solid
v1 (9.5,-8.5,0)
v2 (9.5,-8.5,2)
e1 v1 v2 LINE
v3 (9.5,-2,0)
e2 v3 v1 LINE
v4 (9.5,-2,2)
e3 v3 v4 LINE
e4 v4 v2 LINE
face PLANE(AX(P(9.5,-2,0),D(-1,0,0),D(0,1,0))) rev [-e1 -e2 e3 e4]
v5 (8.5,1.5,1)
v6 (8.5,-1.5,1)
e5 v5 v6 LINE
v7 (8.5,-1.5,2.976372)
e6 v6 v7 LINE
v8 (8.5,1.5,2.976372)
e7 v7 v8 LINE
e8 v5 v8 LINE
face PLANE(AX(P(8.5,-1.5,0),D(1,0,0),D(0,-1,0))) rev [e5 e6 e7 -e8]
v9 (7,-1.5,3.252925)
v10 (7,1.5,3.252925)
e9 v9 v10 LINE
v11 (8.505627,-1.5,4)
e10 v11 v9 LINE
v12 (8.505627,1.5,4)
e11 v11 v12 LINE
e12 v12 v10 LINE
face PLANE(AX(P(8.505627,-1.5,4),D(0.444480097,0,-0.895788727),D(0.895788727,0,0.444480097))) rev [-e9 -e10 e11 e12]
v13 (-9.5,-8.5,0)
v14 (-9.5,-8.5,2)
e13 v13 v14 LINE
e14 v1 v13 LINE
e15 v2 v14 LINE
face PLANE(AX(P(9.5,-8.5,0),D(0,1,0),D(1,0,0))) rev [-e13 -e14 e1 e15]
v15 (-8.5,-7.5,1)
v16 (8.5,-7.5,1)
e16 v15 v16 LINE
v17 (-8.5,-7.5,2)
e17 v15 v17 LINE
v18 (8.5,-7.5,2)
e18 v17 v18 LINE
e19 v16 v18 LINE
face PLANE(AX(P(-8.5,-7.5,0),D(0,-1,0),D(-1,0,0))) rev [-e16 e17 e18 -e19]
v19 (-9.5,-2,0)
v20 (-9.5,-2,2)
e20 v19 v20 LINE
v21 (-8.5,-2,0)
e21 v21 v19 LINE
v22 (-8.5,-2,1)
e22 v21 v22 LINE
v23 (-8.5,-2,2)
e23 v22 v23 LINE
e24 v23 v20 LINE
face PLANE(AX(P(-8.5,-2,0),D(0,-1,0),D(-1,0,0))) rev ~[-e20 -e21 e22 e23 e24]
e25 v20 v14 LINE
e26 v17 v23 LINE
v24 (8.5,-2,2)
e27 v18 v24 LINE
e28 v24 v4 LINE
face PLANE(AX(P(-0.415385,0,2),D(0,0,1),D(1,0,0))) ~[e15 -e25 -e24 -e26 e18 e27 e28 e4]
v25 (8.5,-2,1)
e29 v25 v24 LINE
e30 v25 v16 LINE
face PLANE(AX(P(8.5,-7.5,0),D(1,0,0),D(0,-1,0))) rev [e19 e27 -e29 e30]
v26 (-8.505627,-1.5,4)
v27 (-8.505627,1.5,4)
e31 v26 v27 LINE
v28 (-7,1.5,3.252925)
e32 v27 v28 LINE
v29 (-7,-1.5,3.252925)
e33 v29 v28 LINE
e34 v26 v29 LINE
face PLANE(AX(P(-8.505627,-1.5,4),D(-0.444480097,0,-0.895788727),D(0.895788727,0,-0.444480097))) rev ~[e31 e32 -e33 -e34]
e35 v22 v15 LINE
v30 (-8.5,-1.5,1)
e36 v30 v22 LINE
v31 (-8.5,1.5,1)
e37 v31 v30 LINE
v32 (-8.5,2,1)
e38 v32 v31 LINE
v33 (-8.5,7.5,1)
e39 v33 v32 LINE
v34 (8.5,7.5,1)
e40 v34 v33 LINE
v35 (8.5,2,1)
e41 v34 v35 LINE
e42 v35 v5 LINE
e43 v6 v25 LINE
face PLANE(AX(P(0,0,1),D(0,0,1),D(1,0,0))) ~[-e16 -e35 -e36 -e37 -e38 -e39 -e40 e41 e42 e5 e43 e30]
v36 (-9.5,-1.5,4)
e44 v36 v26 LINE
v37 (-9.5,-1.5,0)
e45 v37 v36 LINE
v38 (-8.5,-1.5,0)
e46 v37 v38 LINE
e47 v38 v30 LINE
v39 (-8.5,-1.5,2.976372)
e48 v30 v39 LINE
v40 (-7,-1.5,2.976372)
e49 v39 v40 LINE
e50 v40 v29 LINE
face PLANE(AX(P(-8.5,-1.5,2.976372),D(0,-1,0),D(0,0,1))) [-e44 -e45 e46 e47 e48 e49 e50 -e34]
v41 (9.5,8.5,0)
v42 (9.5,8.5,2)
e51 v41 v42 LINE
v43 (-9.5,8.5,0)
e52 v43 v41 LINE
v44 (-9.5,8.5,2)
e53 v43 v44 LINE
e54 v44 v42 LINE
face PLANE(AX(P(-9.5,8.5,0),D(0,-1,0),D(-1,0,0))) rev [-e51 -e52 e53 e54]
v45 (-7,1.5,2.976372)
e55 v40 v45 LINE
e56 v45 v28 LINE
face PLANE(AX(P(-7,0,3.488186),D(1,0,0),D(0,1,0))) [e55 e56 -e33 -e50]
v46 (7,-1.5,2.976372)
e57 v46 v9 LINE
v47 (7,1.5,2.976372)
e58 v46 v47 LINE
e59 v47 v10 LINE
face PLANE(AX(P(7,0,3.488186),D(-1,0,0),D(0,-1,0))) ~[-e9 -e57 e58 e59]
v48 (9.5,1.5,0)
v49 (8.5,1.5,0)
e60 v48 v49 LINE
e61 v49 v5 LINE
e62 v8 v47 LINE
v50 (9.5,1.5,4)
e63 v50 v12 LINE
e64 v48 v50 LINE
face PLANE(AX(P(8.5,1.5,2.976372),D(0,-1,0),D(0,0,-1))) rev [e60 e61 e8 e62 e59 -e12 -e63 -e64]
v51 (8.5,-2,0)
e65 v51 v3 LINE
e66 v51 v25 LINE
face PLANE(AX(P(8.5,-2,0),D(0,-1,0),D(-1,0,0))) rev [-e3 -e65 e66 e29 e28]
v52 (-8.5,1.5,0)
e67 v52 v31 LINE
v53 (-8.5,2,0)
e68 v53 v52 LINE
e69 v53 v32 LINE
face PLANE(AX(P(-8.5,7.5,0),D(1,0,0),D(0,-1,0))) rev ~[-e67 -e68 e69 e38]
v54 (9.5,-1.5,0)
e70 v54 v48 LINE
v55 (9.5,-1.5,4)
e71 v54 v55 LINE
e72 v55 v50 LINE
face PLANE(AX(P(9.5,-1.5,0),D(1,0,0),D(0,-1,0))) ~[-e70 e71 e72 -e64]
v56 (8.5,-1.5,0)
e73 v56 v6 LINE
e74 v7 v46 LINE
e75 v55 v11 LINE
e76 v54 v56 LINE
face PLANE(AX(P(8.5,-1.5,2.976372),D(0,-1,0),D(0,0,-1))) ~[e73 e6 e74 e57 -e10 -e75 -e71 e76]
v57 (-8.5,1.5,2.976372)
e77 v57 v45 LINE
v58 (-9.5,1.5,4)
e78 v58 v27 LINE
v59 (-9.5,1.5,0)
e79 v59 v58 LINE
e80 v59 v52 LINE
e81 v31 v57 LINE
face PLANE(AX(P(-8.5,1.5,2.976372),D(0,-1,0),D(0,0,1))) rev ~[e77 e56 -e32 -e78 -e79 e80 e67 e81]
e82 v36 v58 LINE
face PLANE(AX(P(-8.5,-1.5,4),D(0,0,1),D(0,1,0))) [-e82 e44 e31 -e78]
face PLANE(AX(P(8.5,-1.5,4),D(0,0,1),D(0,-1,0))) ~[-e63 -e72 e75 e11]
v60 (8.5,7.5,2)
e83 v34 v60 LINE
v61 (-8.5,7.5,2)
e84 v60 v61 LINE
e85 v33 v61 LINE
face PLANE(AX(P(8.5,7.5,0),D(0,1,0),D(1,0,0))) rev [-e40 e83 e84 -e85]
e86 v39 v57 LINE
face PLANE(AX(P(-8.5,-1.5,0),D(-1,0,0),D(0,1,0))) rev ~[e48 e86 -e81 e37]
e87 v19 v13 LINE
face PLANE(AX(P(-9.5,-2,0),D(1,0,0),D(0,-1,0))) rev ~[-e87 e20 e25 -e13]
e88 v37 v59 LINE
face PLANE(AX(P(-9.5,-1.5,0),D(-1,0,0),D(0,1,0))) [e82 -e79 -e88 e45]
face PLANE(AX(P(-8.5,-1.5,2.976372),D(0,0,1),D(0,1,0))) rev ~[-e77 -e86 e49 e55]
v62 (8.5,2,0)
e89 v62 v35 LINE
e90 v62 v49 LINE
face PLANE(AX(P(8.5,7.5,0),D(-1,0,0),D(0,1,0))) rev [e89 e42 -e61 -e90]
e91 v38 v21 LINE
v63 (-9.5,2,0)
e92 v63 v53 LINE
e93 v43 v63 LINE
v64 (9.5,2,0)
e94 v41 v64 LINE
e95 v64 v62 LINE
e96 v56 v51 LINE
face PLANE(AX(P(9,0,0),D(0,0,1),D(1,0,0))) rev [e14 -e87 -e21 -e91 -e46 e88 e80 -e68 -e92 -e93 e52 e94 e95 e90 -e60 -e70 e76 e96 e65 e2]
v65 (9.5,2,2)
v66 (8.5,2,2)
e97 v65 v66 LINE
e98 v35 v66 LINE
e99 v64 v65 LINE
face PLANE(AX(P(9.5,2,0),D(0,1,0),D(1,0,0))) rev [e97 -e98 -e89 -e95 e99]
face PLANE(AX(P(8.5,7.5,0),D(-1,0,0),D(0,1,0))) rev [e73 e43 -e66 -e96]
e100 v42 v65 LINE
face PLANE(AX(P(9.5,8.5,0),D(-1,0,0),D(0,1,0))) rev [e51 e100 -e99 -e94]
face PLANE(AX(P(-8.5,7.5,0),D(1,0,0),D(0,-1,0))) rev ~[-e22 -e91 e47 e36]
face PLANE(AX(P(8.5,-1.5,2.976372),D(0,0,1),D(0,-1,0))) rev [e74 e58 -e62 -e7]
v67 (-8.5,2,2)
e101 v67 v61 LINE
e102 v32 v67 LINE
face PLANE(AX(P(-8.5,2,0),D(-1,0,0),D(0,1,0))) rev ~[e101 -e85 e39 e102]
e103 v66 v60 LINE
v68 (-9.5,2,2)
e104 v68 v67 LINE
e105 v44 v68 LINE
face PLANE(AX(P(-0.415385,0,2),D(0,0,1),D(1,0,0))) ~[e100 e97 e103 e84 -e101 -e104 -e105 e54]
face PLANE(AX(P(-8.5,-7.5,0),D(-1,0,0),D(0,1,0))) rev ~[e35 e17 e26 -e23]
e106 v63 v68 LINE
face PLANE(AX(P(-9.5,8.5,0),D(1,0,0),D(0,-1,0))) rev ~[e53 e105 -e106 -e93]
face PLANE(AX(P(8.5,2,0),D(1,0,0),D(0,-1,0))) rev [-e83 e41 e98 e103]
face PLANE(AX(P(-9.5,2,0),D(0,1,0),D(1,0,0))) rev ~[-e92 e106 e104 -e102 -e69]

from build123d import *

# Parameters (mm, degrees)
F1_DEPTH  = 1
F2_DEPTH  = 2
F0_W      = 1
F0_H      = 3
F3_DEPTH  = 4
F4_W      = 3
F4_H      = 1.0236278605
F5_DEPTH  = 1.5
F7_DEPTH  = 3
F9_DEPTH  = 2
F10_W     = 8.5
F10_H     = 15
F11_DEPTH = 2


# Not quite as in the source:
# - a feature names something its author has since deleted; it is built from what else it names


with BuildPart() as f1:
    # F0 (on Top) → F1 (new body)
    with BuildSketch(Plane.XY):
        Polygon((-8.5, 7.5), (-8.5, 2), (-8.5, 1.5), (-8.5, -1.5), (-8.5, -2), (-8.5, -7.5), (8.5, -7.5), (8.5, 7.5), align=None)
    extrude(amount=F1_DEPTH)

    # F0 (on Top) → F2 (join)
    with BuildSketch(Plane.XY):
        Polygon((9.5, 8.5), (-9.5, 8.5), (-9.5, 2), (-8.5, 2), (-8.5, 7.5), (8.5, 7.5), (8.5, -7.5), (-8.5, -7.5), (-8.5, -2), (-9.5, -2), (-9.5, -8.5), (9.5, -8.5), align=None)
    extrude(amount=F2_DEPTH)

    # F0 (on Top) → F3 (join)
    with BuildSketch(Plane.XY):
        with Locations((-9, 0)):
            Rectangle(F0_W, F0_H)
    extrude(amount=F3_DEPTH)

    # F4 (on face) → F5 (join)
    with BuildSketch(Plane.YZ.offset(-8.5)):
        with Locations((0, 3.4881860698)):
            Rectangle(F4_W, F4_H)
    extrude(amount=F5_DEPTH)

    # F6 (on face) → F7 (cut)
    with BuildSketch(Plane.XZ.offset(1.5)):
        Polygon((-8.5056265816, 4), (-7, 3.2529253513), (-7, 4), align=None)
    extrude(amount=-F7_DEPTH, mode=Mode.SUBTRACT)

    # F8 (on face) → F9 (cut)
    with BuildSketch(Plane.XY.offset(2)):
        Polygon((9.5, 8.5), (0, 8.5), (0, 7.5), (8.5, 7.5), (8.5, -7.5), (0, -7.5), (0, -8.5), (9.5, -8.5), align=None)
    extrude(amount=-F9_DEPTH, mode=Mode.SUBTRACT)

    # F10 (on face) → F11 (cut)
    with BuildSketch(Plane.XY.offset(1)):
        with Locations((4.25, 0)):
            Rectangle(F10_W, F10_H)
    extrude(amount=-F11_DEPTH, mode=Mode.SUBTRACT)

    # F12: F1 across plane


with BuildPart() as f1_1:
    add(f1.part)
    add(f1.part.mirror(Plane.YZ))


solid = f1_1.part
